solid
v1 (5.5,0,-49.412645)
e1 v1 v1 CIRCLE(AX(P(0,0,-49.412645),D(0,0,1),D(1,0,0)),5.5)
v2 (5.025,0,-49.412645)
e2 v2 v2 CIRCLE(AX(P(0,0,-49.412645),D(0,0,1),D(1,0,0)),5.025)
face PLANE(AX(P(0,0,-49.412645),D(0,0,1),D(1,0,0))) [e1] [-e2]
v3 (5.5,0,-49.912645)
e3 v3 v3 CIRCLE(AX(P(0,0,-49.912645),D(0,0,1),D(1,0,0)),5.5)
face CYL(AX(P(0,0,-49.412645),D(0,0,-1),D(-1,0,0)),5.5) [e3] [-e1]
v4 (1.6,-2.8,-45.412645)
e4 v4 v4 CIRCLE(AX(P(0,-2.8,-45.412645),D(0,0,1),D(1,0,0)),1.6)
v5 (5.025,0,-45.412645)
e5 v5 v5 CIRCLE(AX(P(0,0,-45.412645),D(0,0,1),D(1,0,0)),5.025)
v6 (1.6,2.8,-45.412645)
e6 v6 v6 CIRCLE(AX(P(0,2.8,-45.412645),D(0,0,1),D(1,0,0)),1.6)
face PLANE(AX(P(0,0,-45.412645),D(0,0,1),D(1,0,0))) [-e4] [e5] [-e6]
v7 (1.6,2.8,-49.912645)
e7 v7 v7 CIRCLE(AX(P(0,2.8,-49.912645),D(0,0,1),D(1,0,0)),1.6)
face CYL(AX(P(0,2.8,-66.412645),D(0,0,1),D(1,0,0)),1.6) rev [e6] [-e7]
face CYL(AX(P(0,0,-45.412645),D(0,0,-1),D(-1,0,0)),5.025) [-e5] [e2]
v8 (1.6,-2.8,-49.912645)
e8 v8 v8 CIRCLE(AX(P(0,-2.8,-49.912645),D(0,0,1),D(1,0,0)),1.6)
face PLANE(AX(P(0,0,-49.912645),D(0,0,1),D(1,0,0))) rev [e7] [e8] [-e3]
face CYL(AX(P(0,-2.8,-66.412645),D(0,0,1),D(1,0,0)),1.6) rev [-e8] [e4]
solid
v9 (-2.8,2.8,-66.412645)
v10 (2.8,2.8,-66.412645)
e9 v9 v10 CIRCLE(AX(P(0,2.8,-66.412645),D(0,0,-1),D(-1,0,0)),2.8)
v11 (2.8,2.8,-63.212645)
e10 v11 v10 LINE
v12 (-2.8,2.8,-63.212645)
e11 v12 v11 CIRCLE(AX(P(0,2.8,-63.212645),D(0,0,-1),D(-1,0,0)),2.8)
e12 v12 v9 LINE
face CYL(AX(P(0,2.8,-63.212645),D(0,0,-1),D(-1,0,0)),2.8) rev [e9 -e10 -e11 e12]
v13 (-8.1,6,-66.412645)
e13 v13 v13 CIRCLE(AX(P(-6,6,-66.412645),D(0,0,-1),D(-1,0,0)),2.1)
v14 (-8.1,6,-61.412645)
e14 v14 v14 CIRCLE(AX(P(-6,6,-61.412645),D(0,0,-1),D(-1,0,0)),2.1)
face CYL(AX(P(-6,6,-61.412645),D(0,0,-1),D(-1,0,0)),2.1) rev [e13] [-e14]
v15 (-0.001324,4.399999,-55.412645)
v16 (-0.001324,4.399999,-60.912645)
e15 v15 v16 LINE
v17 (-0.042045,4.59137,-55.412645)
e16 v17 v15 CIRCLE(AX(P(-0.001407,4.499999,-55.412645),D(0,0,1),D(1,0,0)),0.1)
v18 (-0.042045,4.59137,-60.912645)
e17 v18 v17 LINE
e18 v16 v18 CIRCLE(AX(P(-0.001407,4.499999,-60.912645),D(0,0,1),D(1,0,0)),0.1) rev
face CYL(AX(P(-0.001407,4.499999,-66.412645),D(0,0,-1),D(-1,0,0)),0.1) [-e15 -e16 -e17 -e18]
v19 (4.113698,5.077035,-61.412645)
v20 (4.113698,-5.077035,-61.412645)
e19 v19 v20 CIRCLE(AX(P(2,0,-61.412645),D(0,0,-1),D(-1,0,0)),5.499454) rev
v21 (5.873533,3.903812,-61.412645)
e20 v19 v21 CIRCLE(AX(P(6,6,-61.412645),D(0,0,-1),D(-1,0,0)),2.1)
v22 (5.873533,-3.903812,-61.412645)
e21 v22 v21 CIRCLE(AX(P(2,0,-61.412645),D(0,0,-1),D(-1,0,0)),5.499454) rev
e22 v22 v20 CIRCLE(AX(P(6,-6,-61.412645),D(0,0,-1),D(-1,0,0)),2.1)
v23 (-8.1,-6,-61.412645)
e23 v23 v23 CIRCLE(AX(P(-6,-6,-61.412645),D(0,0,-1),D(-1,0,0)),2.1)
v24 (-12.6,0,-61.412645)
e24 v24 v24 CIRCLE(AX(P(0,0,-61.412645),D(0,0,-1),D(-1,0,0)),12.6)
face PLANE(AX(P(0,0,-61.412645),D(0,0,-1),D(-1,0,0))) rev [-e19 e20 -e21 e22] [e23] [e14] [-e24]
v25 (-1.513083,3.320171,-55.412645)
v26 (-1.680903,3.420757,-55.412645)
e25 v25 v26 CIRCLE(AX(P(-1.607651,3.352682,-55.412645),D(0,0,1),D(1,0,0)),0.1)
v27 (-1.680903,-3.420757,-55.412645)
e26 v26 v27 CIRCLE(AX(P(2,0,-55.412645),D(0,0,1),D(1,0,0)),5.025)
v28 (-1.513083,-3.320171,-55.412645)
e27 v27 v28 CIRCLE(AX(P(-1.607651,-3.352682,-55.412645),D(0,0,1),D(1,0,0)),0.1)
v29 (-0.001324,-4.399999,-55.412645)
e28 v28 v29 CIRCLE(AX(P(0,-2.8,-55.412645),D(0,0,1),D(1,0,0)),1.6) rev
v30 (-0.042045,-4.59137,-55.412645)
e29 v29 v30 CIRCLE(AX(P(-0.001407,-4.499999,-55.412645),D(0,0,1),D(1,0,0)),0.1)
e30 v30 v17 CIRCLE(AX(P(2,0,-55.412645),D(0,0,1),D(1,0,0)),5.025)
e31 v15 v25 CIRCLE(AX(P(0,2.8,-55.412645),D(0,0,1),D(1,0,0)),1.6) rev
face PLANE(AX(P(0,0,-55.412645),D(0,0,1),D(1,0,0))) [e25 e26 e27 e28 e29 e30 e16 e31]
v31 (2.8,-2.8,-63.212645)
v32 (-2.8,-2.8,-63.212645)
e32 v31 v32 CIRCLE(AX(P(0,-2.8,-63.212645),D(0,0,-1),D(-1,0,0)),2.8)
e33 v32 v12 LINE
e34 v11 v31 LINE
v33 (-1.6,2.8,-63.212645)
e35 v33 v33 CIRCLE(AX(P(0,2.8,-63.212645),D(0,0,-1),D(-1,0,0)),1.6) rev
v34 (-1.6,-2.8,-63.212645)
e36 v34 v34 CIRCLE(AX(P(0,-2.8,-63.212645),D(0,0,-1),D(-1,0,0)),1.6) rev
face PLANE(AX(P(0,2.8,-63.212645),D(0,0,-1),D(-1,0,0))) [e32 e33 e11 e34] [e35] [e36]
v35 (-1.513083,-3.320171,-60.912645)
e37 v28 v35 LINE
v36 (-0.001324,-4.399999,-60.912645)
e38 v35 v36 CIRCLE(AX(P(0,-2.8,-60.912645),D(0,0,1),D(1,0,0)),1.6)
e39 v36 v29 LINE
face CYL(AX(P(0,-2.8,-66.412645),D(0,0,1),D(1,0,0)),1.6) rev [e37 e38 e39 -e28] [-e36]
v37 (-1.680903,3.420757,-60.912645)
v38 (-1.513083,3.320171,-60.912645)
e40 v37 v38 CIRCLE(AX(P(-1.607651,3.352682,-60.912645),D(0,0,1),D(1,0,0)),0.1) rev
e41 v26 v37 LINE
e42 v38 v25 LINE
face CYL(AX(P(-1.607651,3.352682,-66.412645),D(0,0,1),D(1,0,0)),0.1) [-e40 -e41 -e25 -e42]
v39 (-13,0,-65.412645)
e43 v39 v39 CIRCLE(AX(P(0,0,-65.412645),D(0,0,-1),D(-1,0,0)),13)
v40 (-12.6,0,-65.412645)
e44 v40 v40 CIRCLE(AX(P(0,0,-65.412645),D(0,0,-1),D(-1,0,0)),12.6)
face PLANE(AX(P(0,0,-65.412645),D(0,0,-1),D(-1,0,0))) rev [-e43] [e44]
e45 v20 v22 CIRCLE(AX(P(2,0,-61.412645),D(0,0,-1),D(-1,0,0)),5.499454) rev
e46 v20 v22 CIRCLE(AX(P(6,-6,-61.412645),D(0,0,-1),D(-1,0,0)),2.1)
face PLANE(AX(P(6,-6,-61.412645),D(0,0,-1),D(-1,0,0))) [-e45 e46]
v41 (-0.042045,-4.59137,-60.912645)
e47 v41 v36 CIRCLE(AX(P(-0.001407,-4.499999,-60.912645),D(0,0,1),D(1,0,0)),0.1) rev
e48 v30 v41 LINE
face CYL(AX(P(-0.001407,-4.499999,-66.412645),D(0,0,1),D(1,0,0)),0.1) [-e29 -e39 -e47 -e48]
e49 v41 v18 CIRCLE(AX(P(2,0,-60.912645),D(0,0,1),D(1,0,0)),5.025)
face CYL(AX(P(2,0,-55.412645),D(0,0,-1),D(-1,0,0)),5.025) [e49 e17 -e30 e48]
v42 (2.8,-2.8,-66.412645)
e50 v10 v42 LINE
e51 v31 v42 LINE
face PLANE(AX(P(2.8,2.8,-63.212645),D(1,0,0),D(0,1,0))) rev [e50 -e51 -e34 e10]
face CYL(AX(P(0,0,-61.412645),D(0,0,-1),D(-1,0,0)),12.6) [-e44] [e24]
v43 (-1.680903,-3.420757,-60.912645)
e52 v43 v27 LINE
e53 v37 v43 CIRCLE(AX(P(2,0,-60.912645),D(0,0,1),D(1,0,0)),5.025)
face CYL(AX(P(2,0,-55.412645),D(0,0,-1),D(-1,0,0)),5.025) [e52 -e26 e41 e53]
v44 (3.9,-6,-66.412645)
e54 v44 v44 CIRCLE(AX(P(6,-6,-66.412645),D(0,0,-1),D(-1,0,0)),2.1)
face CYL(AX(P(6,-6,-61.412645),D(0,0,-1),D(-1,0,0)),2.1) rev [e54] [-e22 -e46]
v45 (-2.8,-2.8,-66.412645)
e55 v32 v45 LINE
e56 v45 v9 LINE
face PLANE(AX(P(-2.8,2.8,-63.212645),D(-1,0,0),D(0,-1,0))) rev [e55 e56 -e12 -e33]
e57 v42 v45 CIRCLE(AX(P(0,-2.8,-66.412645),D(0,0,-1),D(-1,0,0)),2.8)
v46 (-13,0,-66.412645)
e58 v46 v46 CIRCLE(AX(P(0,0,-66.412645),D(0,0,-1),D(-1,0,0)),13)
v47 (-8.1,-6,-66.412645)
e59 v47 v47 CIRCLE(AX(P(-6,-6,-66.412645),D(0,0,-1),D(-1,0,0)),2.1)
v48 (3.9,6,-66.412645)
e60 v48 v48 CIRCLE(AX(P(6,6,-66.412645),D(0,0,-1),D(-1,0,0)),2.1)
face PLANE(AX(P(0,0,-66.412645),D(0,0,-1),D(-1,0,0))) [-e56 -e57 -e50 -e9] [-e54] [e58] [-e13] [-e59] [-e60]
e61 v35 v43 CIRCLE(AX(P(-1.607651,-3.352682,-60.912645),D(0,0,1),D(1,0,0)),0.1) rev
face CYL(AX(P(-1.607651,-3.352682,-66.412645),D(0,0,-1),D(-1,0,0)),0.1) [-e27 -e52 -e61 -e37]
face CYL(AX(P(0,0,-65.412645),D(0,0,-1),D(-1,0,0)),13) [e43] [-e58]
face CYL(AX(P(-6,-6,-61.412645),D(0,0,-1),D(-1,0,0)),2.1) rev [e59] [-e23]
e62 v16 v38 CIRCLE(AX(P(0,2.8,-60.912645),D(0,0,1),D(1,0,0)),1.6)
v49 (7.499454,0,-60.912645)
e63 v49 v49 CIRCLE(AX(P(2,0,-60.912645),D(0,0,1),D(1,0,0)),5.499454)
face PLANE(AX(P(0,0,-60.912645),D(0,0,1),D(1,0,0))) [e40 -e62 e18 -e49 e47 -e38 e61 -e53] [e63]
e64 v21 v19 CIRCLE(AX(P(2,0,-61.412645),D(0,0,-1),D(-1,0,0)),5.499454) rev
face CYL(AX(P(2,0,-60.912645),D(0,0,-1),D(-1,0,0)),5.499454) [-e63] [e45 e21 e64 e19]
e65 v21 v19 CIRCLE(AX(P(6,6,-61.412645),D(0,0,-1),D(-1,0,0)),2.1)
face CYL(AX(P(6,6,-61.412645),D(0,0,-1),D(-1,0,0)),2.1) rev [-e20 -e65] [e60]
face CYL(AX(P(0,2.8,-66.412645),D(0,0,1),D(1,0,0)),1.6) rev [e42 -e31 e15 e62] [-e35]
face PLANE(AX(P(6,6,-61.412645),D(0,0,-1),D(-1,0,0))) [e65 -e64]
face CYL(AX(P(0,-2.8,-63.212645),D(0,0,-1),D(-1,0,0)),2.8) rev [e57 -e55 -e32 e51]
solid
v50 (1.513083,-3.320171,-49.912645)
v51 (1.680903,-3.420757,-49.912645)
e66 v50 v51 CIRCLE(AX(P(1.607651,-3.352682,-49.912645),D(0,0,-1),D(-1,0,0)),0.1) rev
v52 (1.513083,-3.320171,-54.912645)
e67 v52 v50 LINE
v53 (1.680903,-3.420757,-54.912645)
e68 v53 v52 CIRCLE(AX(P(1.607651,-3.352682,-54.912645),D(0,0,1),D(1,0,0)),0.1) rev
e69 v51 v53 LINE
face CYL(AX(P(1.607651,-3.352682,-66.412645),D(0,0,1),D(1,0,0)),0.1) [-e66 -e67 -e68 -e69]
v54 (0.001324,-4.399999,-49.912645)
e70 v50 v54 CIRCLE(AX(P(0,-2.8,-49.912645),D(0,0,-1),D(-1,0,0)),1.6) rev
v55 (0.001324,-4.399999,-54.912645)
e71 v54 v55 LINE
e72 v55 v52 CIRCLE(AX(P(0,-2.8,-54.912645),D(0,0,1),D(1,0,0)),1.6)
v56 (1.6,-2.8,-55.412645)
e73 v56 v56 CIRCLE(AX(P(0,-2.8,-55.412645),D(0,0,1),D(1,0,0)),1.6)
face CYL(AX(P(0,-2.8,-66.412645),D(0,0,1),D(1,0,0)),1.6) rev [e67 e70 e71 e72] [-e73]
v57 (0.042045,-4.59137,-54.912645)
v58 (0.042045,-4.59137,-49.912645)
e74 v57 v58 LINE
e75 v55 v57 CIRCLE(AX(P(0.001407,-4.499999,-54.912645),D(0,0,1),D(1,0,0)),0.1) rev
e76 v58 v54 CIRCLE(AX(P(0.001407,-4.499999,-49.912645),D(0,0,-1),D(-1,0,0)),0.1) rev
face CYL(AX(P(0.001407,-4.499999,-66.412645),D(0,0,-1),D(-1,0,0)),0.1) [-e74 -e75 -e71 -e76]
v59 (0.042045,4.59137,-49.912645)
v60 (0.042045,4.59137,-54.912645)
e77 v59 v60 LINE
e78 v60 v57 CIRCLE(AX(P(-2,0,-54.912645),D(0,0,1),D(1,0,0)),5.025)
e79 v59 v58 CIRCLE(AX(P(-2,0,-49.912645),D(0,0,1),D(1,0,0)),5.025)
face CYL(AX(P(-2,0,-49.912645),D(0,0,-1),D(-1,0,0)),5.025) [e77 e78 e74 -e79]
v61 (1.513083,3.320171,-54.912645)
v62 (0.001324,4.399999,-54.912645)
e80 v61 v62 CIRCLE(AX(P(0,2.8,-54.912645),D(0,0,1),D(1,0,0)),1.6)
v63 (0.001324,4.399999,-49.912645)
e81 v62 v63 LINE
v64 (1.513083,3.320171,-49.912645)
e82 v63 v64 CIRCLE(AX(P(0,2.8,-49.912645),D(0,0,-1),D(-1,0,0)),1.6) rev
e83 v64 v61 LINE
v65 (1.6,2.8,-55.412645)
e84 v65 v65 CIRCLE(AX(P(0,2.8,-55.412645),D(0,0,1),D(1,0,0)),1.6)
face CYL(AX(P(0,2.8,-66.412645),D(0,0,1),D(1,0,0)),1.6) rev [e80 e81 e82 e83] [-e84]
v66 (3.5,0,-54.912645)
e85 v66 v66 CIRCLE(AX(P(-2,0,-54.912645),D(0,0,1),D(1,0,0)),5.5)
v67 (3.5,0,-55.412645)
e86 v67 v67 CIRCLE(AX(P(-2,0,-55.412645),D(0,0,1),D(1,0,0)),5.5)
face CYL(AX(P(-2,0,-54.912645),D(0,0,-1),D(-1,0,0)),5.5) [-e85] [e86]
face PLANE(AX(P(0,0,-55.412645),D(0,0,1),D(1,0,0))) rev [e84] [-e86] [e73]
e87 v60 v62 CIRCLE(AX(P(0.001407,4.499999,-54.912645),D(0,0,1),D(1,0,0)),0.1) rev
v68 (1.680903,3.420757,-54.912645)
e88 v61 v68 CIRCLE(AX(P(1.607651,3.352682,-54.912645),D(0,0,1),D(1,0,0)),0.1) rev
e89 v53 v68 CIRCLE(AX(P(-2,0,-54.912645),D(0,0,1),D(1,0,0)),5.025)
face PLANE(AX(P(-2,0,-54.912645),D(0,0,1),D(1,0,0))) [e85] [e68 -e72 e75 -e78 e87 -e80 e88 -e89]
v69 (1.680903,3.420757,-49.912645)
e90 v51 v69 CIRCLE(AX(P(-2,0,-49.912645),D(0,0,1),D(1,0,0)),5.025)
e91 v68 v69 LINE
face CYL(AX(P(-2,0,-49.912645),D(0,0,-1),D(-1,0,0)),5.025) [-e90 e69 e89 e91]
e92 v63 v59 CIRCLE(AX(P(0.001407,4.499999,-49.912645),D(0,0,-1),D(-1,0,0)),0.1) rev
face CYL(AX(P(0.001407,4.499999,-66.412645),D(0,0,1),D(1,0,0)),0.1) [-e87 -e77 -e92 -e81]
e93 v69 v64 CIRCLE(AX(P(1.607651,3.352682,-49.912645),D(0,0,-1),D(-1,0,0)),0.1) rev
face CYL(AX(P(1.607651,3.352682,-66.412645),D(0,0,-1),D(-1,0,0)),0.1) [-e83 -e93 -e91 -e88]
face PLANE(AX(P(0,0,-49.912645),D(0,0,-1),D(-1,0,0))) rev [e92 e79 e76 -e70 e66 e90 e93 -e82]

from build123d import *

# Parameters (mm, degrees)
SKETCH1_R            = 12.6
BOSS_EXTRUDE1_DEPTH  = 5
SKETCH2_R            = 5.499454457575955
SKETCH2_R_2          = 5.0249999999999995
BOSS_EXTRUDE2_DEPTH  = 0.5
SKETCH2_3_R          = 5.0249999999999995
BOSS_EXTRUDE3_DEPTH  = 6
BOSS_EXTRUDE4_START  = 6
SKETCH3_R            = 5.5
SKETCH3_R_2          = 5.0249999999999995
BOSS_EXTRUDE4_DEPTH  = 0.5
BOSS_EXTRUDE5_START  = 6
SKETCH3_3_R          = 5.0249999999999995
BOSS_EXTRUDE5_DEPTH  = 5.5
BOSS_EXTRUDE6_START  = 11.5
SKETCH4_R            = 5.5
SKETCH4_R_2          = 5.0249999999999995
BOSS_EXTRUDE6_DEPTH  = 0.5
BOSS_EXTRUDE7_START  = 11.5
SKETCH4_7_R          = 5.0249999999999995
BOSS_EXTRUDE7_DEPTH  = 4.5
SKETCH5_R            = 1.6000000000000003
CUT_EXTRUDE1_DEPTH   = 28.54124180206839
SPLIT1_START         = -55.412644993
SPLIT1_OUTLINE_R     = 1.6
SPLIT1_DEPTH         = 10
SPLIT1_2_DEPTH       = 5.5
SPLIT1_3_OUTLINE_R   = 5.5
SPLIT1_3_DEPTH       = 0.5
SPLIT1_START_2       = -49.912644993
SPLIT1_4_OUTLINE_R   = 5.025
SPLIT1_4_OUTLINE_R_2 = 1.6
SPLIT1_4_DEPTH       = 4.5
SPLIT1_5_OUTLINE_R   = 5.5
SPLIT1_5_OUTLINE_R_2 = 5.025
SPLIT1_5_DEPTH       = 0.5
FILLET1_R            = 0.1
FILLET2_R            = 0.1
CUT_EXTRUDE2_DEPTH   = 3.2
SKETCH7_R            = 2.1000000000000005
SKETCH7_R_2          = 2.099999999999999
SKETCH7_R_3          = 2.1000000000000014
CUT_EXTRUDE3_DEPTH   = 5
SKETCH8_R            = 13
SKETCH8_R_2          = 12.600000000000003
BOSS_EXTRUDE8_DEPTH  = 1


# Read off the part's stored shape, not the designer's step: Split1
with BuildPart() as part:
    # Sketch1 → Boss-Extrude1 (new body)
    with BuildSketch(Plane(origin=(0, 0, -66.41264499315878), x_dir=(-1, 0, 0), z_dir=(0, 0, -1))):
        Circle(SKETCH1_R)
    extrude(amount=-BOSS_EXTRUDE1_DEPTH)

    # Sketch2 → Boss-Extrude2 (add)
    with BuildSketch(Plane.XY.offset(-61.412644993158786)):
        with Locations(Location((2, 0, 0), (0, 0, 180))):
            Circle(SKETCH2_R)
        with Locations((2, 0)):
            Circle(SKETCH2_R_2, mode=Mode.SUBTRACT)
    extrude(amount=BOSS_EXTRUDE2_DEPTH)

    # Sketch2<3> → Boss-Extrude3 (add)
    with BuildSketch(Plane.XY.offset(-61.412644993158786)):
        with Locations((2, 0)):
            Circle(SKETCH2_3_R)
    extrude(amount=BOSS_EXTRUDE3_DEPTH)



with BuildPart() as body_2:
    # Sketch3 → Boss-Extrude4 (new body)
    with BuildSketch(Plane.XY.offset(-61.412644993158786).offset(BOSS_EXTRUDE4_START)):
        with Locations((-2, -2.4e-16)):
            Circle(SKETCH3_R)
        with Locations((-2, -2.4e-16)):
            Circle(SKETCH3_R_2, mode=Mode.SUBTRACT)
    extrude(amount=BOSS_EXTRUDE4_DEPTH)


with BuildPart() as part_1:
    add(part.part)

    add(body_2.part)  # Boss-Extrude5 merges body 2
    # Sketch3<3> → Boss-Extrude5 (add)
    with BuildSketch(Plane.XY.offset(-61.412644993158786).offset(BOSS_EXTRUDE5_START)):
        with Locations((-2, -2.4e-16)):
            Circle(SKETCH3_3_R)
    extrude(amount=BOSS_EXTRUDE5_DEPTH)

    # Sketch4 → Boss-Extrude6 (add)
    with BuildSketch(Plane.XY.offset(-61.412644993158786).offset(BOSS_EXTRUDE6_START)):
        with Locations(Location((0, 0, 0), (0, 0, 114.145956113))):
            Circle(SKETCH4_R)
        with Locations(Location((0, 0, 0), (0, 0, 101.478778724))):
            Circle(SKETCH4_R_2, mode=Mode.SUBTRACT)
    extrude(amount=BOSS_EXTRUDE6_DEPTH)

    # Sketch4<7> → Boss-Extrude7 (add)
    with BuildSketch(Plane.XY.offset(-61.412644993158786).offset(BOSS_EXTRUDE7_START)):
        Circle(SKETCH4_7_R)
    extrude(amount=BOSS_EXTRUDE7_DEPTH)

    # Sketch5 → Cut-Extrude1 (cut, through all)
    with BuildSketch(Plane.XY.offset(-45.41264499315879)):
        with Locations((2e-17, 2.8)):
            Circle(SKETCH5_R)
        with Locations((7.1e-16, -2.8)):
            Circle(SKETCH5_R)
    extrude(amount=-CUT_EXTRUDE1_DEPTH, mode=Mode.SUBTRACT)

    # Split1 outline → Split1 (cut)
    with BuildSketch(Plane.XY.offset(SPLIT1_START)):
        with BuildLine():
            ThreePointArc((-1, 5.408326913), (-7.5, 0), (-1, -5.408326913))
            ThreePointArc((-1, -5.408326913), (5.5, 0), (-1, 5.408326913))
        make_face()
        with Locations((0, 2.8)):
            Circle(SPLIT1_OUTLINE_R, mode=Mode.SUBTRACT)
        with Locations((0, -2.8)):
            Circle(SPLIT1_OUTLINE_R, mode=Mode.SUBTRACT)
    extrude(amount=SPLIT1_DEPTH, mode=Mode.SUBTRACT)

    # Fillet2
    fillet2_edges = [part_1.edges().sort_by_distance(p)[0] for p in [
        (-0.6950501563684846, -4.241147209736796, -58.162644993158786),
        (-1.1378256882261084, -3.9248789726956352, -58.162644993158786),
        (-1.1378256882260929, 3.924878972695648, -58.162644993158786),
        (-0.6950501563685023, 4.241147209736784, -58.162644993158786),
    ]]
    fillet(fillet2_edges, radius=FILLET2_R)

    # Sketch6 → Cut-Extrude2 (cut)
    with BuildSketch(Plane(origin=(0, 0, -66.41264499315878), x_dir=(-1, 0, 0), z_dir=(0, 0, -1))):
        with BuildLine():
            Line((2.8, 2.8), (2.799999999999999, -2.8))
            ThreePointArc((2.799999999999999, -2.8), (-1.22e-15, -5.6), (-2.8000000000000007, -2.8))
            Line((-2.8000000000000007, -2.8), (-2.8, 2.8))
            ThreePointArc((-2.8, 2.8), (1.5e-16, 5.6), (2.8, 2.8))
        make_face()
    extrude(amount=-CUT_EXTRUDE2_DEPTH, mode=Mode.SUBTRACT)

    # Sketch7 → Cut-Extrude3 (cut)
    with BuildSketch(Plane(origin=(0, 0, -66.41264499315878), x_dir=(-1, 0, 0), z_dir=(0, 0, -1))):
        with Locations((-6.000000000000002, 5.999999999999999)):
            Circle(SKETCH7_R)
        with Locations((5.999999999999998, 5.999999999999999)):
            Circle(SKETCH7_R)
        with Locations((5.999999999999998, -6.000000000000001)):
            Circle(SKETCH7_R_2)
        with Locations((-6.000000000000003, -6)):
            Circle(SKETCH7_R_3)
    extrude(amount=-CUT_EXTRUDE3_DEPTH, mode=Mode.SUBTRACT)

    # Sketch8 → Boss-Extrude8 (add)
    with BuildSketch(Plane(origin=(0, 0, -66.41264499315878), x_dir=(-1, 0, 0), z_dir=(0, 0, -1))):
        Circle(SKETCH8_R)
        Circle(SKETCH8_R_2, mode=Mode.SUBTRACT)
    extrude(amount=-BOSS_EXTRUDE8_DEPTH)


with BuildPart() as body_2_2:
    # Split1 2 outline → Split1 2 (new body)
    with BuildSketch(Plane.XY.offset(SPLIT1_START)):
        with BuildLine():
            ThreePointArc((1.137825688, -3.924878973), (3.025, 0), (1.137825688, 3.924878973))
            ThreePointArc((1.137825688, 3.924878973), (-0.92998111, 1.498026446), (0.695050156, 4.24114721))
            ThreePointArc((0.695050156, 4.24114721), (-7.025, 0), (0.695050156, -4.24114721))
            ThreePointArc((0.695050156, -4.24114721), (-0.92998111, -1.498026446), (1.137825688, -3.924878973))
        make_face()
    extrude(amount=SPLIT1_2_DEPTH)

    # Split1 3 outline → Split1 3 (add)
    with BuildSketch(Plane.XY.offset(SPLIT1_START)):
        with Locations((-2, 0)):
            Circle(SPLIT1_3_OUTLINE_R)
        with BuildLine():
            ThreePointArc((0.695050156, 4.24114721), (0.92998111, 4.101973554), (1.137825688, 3.924878973))
            ThreePointArc((1.137825688, 3.924878973), (3.025, 0), (1.137825688, -3.924878973))
            ThreePointArc((1.137825688, -3.924878973), (0.92998111, -4.101973554), (0.695050156, -4.24114721))
            ThreePointArc((0.695050156, -4.24114721), (-7.025, 0), (0.695050156, 4.24114721))
        make_face(mode=Mode.SUBTRACT)
    extrude(amount=SPLIT1_3_DEPTH)

    # Fillet1
    # the kernel refuses this fillet: 0.1 mm, written as the material it takes off along each edge
    with BuildSketch(Plane(origin=(1.1378256880000006, -3.924878973, -54.912644993), x_dir=(0.5272838464707954, 0.8496892050926401, 0), z_dir=(0, 0, 1))) as fillet1_piece_1:
        with BuildLine():
            CenterArc((0.7339208558356513, -0.09749554475196075), FILLET1_R, 102.8500510005881, 156.06997269077794)
            Line((0.7147029545095785, -0.19563153340353207), (0.7143185964830571, -0.19759425317656348))
            ThreePointArc((0.7143185964830571, -0.19759425317656348), (0.3532125240431902, -0.1129366525704308), (-0.00066881691387395, -0.00188485647615828))
            Line((-0.00066881691387395, -0.00188485647615828), (0.00044480051866812, 0.00194991089503923))
            ThreePointArc((0.00044480051866812, 0.00194991089503923), (0.35584041495112406, -0.03807128397050696), (0.7112360293835808, 0.00194991089503922))
            Line((0.7112360293835808, 0.00194991089503922), (0.7116808299022489, -4e-17))
        make_face()
    extrude(amount=5, mode=Mode.SUBTRACT)
    with BuildSketch(Plane(origin=(0.6950501559999995, -4.241147210000001, -54.912644993), x_dir=(-0.9747710361649122, -0.22320713934366773, 0), z_dir=(0, 0, 1))) as fillet1_piece_2:
        with BuildLine():
            CenterArc((0.7339208553218103, 0.09749554475551281), FILLET1_R, 101.07997632228573, 156.06997268627677)
            Line((0.714702953972355, 0.19563153340250483), (0.7143185959453658, 0.1975942531754444))
            ThreePointArc((0.7143185959453658, 0.1975942531754444), (0.35321252377659246, 0.11293665255128191), (-0.00066881691414123, 0.00188485647606383))
            Line((-0.00066881691414123, 0.00188485647606383), (0.00044480051835665, -0.00194991089511022))
            ThreePointArc((0.00044480051835665, -0.00194991089511022), (0.35584041470198946, 0.03807128391367618), (0.711236028885622, -0.00194991089511051))
            Line((0.711236028885622, -0.00194991089511051), (0.7116808294039787, 0))
        make_face()
    extrude(amount=5, mode=Mode.SUBTRACT)
    with BuildSketch(Plane(origin=(0.6950501560000002, 4.24114721, -54.912644993), x_dir=(-0.8812560463152725, 0.4726391655721877, 0), z_dir=(0, 0, 1))) as fillet1_piece_3:
        with BuildLine():
            CenterArc((0.7336208593975166, 0.09972781848774585), FILLET1_R, 118.15832442623193, 156.06997268627686)
            Line((0.6864298993019216, 0.18789251258496353), (0.6854860801000094, 0.1896558064669081))
            ThreePointArc((0.6854860801000094, 0.1896558064669081), (0.35326623794808576, 0.05722576797323723), (-8.578182782469e-05, 0.00199815952266453))
            Line((-8.578182782469e-05, 0.00199815952266453), (-0.00014746147927519, -0.00199455636975523))
            ThreePointArc((-0.00014746147927519, -0.00199455636975523), (0.37049696668064286, -0.01567712099081798), (0.7411413948405625, -0.00199455636975463))
            Line((0.7411413948405625, -0.00199455636975463), (0.7409939333612872, 0))
        make_face()
    extrude(amount=5, mode=Mode.SUBTRACT)
    with BuildSketch(Plane(origin=(1.1378256880000008, 3.924878973, -54.912644993), x_dir=(0.7329038743989365, -0.6803322062720741, 0), z_dir=(0, 0, 1))) as fillet1_piece_4:
        with BuildLine():
            CenterArc((0.7336208599111411, -0.09972781848739057), FILLET1_R, 85.77170288473079, 156.06997269077783)
            Line((0.6864298998182243, -0.1878925125860417), (0.6854860806163661, -0.18965580646801475))
            ThreePointArc((0.6854860806163661, -0.18965580646801475), (0.35326623821426095, -0.05722576791705115), (-8.578182712573e-05, -0.00199815952269459))
            Line((-8.578182712573e-05, -0.00199815952269459), (-0.00014746147937158, 0.00199455636974773))
            ThreePointArc((-0.00014746147937158, 0.00199455636974773), (0.3704969669398584, 0.01567712100932383), (0.7411413953590879, 0.00199455636974782))
            Line((0.7411413953590879, 0.00199455636974782), (0.7409939338797163, 3e-17))
        make_face()
    extrude(amount=5, mode=Mode.SUBTRACT)


with BuildPart() as body_3:
    # Split1 4 outline → Split1 4 (new body)
    with BuildSketch(Plane.XY.offset(SPLIT1_START_2)):
        Circle(SPLIT1_4_OUTLINE_R)
        with Locations((0, -2.8)):
            Circle(SPLIT1_4_OUTLINE_R_2, mode=Mode.SUBTRACT)
        with Locations((0, 2.8)):
            Circle(SPLIT1_4_OUTLINE_R_2, mode=Mode.SUBTRACT)
    extrude(amount=SPLIT1_4_DEPTH)

    # Split1 5 outline → Split1 5 (add)
    with BuildSketch(Plane.XY.offset(SPLIT1_START_2)):
        Circle(SPLIT1_5_OUTLINE_R)
        Circle(SPLIT1_5_OUTLINE_R_2, mode=Mode.SUBTRACT)
    extrude(amount=SPLIT1_5_DEPTH)


solid = Compound([part_1.part, body_2_2.part, body_3.part])
